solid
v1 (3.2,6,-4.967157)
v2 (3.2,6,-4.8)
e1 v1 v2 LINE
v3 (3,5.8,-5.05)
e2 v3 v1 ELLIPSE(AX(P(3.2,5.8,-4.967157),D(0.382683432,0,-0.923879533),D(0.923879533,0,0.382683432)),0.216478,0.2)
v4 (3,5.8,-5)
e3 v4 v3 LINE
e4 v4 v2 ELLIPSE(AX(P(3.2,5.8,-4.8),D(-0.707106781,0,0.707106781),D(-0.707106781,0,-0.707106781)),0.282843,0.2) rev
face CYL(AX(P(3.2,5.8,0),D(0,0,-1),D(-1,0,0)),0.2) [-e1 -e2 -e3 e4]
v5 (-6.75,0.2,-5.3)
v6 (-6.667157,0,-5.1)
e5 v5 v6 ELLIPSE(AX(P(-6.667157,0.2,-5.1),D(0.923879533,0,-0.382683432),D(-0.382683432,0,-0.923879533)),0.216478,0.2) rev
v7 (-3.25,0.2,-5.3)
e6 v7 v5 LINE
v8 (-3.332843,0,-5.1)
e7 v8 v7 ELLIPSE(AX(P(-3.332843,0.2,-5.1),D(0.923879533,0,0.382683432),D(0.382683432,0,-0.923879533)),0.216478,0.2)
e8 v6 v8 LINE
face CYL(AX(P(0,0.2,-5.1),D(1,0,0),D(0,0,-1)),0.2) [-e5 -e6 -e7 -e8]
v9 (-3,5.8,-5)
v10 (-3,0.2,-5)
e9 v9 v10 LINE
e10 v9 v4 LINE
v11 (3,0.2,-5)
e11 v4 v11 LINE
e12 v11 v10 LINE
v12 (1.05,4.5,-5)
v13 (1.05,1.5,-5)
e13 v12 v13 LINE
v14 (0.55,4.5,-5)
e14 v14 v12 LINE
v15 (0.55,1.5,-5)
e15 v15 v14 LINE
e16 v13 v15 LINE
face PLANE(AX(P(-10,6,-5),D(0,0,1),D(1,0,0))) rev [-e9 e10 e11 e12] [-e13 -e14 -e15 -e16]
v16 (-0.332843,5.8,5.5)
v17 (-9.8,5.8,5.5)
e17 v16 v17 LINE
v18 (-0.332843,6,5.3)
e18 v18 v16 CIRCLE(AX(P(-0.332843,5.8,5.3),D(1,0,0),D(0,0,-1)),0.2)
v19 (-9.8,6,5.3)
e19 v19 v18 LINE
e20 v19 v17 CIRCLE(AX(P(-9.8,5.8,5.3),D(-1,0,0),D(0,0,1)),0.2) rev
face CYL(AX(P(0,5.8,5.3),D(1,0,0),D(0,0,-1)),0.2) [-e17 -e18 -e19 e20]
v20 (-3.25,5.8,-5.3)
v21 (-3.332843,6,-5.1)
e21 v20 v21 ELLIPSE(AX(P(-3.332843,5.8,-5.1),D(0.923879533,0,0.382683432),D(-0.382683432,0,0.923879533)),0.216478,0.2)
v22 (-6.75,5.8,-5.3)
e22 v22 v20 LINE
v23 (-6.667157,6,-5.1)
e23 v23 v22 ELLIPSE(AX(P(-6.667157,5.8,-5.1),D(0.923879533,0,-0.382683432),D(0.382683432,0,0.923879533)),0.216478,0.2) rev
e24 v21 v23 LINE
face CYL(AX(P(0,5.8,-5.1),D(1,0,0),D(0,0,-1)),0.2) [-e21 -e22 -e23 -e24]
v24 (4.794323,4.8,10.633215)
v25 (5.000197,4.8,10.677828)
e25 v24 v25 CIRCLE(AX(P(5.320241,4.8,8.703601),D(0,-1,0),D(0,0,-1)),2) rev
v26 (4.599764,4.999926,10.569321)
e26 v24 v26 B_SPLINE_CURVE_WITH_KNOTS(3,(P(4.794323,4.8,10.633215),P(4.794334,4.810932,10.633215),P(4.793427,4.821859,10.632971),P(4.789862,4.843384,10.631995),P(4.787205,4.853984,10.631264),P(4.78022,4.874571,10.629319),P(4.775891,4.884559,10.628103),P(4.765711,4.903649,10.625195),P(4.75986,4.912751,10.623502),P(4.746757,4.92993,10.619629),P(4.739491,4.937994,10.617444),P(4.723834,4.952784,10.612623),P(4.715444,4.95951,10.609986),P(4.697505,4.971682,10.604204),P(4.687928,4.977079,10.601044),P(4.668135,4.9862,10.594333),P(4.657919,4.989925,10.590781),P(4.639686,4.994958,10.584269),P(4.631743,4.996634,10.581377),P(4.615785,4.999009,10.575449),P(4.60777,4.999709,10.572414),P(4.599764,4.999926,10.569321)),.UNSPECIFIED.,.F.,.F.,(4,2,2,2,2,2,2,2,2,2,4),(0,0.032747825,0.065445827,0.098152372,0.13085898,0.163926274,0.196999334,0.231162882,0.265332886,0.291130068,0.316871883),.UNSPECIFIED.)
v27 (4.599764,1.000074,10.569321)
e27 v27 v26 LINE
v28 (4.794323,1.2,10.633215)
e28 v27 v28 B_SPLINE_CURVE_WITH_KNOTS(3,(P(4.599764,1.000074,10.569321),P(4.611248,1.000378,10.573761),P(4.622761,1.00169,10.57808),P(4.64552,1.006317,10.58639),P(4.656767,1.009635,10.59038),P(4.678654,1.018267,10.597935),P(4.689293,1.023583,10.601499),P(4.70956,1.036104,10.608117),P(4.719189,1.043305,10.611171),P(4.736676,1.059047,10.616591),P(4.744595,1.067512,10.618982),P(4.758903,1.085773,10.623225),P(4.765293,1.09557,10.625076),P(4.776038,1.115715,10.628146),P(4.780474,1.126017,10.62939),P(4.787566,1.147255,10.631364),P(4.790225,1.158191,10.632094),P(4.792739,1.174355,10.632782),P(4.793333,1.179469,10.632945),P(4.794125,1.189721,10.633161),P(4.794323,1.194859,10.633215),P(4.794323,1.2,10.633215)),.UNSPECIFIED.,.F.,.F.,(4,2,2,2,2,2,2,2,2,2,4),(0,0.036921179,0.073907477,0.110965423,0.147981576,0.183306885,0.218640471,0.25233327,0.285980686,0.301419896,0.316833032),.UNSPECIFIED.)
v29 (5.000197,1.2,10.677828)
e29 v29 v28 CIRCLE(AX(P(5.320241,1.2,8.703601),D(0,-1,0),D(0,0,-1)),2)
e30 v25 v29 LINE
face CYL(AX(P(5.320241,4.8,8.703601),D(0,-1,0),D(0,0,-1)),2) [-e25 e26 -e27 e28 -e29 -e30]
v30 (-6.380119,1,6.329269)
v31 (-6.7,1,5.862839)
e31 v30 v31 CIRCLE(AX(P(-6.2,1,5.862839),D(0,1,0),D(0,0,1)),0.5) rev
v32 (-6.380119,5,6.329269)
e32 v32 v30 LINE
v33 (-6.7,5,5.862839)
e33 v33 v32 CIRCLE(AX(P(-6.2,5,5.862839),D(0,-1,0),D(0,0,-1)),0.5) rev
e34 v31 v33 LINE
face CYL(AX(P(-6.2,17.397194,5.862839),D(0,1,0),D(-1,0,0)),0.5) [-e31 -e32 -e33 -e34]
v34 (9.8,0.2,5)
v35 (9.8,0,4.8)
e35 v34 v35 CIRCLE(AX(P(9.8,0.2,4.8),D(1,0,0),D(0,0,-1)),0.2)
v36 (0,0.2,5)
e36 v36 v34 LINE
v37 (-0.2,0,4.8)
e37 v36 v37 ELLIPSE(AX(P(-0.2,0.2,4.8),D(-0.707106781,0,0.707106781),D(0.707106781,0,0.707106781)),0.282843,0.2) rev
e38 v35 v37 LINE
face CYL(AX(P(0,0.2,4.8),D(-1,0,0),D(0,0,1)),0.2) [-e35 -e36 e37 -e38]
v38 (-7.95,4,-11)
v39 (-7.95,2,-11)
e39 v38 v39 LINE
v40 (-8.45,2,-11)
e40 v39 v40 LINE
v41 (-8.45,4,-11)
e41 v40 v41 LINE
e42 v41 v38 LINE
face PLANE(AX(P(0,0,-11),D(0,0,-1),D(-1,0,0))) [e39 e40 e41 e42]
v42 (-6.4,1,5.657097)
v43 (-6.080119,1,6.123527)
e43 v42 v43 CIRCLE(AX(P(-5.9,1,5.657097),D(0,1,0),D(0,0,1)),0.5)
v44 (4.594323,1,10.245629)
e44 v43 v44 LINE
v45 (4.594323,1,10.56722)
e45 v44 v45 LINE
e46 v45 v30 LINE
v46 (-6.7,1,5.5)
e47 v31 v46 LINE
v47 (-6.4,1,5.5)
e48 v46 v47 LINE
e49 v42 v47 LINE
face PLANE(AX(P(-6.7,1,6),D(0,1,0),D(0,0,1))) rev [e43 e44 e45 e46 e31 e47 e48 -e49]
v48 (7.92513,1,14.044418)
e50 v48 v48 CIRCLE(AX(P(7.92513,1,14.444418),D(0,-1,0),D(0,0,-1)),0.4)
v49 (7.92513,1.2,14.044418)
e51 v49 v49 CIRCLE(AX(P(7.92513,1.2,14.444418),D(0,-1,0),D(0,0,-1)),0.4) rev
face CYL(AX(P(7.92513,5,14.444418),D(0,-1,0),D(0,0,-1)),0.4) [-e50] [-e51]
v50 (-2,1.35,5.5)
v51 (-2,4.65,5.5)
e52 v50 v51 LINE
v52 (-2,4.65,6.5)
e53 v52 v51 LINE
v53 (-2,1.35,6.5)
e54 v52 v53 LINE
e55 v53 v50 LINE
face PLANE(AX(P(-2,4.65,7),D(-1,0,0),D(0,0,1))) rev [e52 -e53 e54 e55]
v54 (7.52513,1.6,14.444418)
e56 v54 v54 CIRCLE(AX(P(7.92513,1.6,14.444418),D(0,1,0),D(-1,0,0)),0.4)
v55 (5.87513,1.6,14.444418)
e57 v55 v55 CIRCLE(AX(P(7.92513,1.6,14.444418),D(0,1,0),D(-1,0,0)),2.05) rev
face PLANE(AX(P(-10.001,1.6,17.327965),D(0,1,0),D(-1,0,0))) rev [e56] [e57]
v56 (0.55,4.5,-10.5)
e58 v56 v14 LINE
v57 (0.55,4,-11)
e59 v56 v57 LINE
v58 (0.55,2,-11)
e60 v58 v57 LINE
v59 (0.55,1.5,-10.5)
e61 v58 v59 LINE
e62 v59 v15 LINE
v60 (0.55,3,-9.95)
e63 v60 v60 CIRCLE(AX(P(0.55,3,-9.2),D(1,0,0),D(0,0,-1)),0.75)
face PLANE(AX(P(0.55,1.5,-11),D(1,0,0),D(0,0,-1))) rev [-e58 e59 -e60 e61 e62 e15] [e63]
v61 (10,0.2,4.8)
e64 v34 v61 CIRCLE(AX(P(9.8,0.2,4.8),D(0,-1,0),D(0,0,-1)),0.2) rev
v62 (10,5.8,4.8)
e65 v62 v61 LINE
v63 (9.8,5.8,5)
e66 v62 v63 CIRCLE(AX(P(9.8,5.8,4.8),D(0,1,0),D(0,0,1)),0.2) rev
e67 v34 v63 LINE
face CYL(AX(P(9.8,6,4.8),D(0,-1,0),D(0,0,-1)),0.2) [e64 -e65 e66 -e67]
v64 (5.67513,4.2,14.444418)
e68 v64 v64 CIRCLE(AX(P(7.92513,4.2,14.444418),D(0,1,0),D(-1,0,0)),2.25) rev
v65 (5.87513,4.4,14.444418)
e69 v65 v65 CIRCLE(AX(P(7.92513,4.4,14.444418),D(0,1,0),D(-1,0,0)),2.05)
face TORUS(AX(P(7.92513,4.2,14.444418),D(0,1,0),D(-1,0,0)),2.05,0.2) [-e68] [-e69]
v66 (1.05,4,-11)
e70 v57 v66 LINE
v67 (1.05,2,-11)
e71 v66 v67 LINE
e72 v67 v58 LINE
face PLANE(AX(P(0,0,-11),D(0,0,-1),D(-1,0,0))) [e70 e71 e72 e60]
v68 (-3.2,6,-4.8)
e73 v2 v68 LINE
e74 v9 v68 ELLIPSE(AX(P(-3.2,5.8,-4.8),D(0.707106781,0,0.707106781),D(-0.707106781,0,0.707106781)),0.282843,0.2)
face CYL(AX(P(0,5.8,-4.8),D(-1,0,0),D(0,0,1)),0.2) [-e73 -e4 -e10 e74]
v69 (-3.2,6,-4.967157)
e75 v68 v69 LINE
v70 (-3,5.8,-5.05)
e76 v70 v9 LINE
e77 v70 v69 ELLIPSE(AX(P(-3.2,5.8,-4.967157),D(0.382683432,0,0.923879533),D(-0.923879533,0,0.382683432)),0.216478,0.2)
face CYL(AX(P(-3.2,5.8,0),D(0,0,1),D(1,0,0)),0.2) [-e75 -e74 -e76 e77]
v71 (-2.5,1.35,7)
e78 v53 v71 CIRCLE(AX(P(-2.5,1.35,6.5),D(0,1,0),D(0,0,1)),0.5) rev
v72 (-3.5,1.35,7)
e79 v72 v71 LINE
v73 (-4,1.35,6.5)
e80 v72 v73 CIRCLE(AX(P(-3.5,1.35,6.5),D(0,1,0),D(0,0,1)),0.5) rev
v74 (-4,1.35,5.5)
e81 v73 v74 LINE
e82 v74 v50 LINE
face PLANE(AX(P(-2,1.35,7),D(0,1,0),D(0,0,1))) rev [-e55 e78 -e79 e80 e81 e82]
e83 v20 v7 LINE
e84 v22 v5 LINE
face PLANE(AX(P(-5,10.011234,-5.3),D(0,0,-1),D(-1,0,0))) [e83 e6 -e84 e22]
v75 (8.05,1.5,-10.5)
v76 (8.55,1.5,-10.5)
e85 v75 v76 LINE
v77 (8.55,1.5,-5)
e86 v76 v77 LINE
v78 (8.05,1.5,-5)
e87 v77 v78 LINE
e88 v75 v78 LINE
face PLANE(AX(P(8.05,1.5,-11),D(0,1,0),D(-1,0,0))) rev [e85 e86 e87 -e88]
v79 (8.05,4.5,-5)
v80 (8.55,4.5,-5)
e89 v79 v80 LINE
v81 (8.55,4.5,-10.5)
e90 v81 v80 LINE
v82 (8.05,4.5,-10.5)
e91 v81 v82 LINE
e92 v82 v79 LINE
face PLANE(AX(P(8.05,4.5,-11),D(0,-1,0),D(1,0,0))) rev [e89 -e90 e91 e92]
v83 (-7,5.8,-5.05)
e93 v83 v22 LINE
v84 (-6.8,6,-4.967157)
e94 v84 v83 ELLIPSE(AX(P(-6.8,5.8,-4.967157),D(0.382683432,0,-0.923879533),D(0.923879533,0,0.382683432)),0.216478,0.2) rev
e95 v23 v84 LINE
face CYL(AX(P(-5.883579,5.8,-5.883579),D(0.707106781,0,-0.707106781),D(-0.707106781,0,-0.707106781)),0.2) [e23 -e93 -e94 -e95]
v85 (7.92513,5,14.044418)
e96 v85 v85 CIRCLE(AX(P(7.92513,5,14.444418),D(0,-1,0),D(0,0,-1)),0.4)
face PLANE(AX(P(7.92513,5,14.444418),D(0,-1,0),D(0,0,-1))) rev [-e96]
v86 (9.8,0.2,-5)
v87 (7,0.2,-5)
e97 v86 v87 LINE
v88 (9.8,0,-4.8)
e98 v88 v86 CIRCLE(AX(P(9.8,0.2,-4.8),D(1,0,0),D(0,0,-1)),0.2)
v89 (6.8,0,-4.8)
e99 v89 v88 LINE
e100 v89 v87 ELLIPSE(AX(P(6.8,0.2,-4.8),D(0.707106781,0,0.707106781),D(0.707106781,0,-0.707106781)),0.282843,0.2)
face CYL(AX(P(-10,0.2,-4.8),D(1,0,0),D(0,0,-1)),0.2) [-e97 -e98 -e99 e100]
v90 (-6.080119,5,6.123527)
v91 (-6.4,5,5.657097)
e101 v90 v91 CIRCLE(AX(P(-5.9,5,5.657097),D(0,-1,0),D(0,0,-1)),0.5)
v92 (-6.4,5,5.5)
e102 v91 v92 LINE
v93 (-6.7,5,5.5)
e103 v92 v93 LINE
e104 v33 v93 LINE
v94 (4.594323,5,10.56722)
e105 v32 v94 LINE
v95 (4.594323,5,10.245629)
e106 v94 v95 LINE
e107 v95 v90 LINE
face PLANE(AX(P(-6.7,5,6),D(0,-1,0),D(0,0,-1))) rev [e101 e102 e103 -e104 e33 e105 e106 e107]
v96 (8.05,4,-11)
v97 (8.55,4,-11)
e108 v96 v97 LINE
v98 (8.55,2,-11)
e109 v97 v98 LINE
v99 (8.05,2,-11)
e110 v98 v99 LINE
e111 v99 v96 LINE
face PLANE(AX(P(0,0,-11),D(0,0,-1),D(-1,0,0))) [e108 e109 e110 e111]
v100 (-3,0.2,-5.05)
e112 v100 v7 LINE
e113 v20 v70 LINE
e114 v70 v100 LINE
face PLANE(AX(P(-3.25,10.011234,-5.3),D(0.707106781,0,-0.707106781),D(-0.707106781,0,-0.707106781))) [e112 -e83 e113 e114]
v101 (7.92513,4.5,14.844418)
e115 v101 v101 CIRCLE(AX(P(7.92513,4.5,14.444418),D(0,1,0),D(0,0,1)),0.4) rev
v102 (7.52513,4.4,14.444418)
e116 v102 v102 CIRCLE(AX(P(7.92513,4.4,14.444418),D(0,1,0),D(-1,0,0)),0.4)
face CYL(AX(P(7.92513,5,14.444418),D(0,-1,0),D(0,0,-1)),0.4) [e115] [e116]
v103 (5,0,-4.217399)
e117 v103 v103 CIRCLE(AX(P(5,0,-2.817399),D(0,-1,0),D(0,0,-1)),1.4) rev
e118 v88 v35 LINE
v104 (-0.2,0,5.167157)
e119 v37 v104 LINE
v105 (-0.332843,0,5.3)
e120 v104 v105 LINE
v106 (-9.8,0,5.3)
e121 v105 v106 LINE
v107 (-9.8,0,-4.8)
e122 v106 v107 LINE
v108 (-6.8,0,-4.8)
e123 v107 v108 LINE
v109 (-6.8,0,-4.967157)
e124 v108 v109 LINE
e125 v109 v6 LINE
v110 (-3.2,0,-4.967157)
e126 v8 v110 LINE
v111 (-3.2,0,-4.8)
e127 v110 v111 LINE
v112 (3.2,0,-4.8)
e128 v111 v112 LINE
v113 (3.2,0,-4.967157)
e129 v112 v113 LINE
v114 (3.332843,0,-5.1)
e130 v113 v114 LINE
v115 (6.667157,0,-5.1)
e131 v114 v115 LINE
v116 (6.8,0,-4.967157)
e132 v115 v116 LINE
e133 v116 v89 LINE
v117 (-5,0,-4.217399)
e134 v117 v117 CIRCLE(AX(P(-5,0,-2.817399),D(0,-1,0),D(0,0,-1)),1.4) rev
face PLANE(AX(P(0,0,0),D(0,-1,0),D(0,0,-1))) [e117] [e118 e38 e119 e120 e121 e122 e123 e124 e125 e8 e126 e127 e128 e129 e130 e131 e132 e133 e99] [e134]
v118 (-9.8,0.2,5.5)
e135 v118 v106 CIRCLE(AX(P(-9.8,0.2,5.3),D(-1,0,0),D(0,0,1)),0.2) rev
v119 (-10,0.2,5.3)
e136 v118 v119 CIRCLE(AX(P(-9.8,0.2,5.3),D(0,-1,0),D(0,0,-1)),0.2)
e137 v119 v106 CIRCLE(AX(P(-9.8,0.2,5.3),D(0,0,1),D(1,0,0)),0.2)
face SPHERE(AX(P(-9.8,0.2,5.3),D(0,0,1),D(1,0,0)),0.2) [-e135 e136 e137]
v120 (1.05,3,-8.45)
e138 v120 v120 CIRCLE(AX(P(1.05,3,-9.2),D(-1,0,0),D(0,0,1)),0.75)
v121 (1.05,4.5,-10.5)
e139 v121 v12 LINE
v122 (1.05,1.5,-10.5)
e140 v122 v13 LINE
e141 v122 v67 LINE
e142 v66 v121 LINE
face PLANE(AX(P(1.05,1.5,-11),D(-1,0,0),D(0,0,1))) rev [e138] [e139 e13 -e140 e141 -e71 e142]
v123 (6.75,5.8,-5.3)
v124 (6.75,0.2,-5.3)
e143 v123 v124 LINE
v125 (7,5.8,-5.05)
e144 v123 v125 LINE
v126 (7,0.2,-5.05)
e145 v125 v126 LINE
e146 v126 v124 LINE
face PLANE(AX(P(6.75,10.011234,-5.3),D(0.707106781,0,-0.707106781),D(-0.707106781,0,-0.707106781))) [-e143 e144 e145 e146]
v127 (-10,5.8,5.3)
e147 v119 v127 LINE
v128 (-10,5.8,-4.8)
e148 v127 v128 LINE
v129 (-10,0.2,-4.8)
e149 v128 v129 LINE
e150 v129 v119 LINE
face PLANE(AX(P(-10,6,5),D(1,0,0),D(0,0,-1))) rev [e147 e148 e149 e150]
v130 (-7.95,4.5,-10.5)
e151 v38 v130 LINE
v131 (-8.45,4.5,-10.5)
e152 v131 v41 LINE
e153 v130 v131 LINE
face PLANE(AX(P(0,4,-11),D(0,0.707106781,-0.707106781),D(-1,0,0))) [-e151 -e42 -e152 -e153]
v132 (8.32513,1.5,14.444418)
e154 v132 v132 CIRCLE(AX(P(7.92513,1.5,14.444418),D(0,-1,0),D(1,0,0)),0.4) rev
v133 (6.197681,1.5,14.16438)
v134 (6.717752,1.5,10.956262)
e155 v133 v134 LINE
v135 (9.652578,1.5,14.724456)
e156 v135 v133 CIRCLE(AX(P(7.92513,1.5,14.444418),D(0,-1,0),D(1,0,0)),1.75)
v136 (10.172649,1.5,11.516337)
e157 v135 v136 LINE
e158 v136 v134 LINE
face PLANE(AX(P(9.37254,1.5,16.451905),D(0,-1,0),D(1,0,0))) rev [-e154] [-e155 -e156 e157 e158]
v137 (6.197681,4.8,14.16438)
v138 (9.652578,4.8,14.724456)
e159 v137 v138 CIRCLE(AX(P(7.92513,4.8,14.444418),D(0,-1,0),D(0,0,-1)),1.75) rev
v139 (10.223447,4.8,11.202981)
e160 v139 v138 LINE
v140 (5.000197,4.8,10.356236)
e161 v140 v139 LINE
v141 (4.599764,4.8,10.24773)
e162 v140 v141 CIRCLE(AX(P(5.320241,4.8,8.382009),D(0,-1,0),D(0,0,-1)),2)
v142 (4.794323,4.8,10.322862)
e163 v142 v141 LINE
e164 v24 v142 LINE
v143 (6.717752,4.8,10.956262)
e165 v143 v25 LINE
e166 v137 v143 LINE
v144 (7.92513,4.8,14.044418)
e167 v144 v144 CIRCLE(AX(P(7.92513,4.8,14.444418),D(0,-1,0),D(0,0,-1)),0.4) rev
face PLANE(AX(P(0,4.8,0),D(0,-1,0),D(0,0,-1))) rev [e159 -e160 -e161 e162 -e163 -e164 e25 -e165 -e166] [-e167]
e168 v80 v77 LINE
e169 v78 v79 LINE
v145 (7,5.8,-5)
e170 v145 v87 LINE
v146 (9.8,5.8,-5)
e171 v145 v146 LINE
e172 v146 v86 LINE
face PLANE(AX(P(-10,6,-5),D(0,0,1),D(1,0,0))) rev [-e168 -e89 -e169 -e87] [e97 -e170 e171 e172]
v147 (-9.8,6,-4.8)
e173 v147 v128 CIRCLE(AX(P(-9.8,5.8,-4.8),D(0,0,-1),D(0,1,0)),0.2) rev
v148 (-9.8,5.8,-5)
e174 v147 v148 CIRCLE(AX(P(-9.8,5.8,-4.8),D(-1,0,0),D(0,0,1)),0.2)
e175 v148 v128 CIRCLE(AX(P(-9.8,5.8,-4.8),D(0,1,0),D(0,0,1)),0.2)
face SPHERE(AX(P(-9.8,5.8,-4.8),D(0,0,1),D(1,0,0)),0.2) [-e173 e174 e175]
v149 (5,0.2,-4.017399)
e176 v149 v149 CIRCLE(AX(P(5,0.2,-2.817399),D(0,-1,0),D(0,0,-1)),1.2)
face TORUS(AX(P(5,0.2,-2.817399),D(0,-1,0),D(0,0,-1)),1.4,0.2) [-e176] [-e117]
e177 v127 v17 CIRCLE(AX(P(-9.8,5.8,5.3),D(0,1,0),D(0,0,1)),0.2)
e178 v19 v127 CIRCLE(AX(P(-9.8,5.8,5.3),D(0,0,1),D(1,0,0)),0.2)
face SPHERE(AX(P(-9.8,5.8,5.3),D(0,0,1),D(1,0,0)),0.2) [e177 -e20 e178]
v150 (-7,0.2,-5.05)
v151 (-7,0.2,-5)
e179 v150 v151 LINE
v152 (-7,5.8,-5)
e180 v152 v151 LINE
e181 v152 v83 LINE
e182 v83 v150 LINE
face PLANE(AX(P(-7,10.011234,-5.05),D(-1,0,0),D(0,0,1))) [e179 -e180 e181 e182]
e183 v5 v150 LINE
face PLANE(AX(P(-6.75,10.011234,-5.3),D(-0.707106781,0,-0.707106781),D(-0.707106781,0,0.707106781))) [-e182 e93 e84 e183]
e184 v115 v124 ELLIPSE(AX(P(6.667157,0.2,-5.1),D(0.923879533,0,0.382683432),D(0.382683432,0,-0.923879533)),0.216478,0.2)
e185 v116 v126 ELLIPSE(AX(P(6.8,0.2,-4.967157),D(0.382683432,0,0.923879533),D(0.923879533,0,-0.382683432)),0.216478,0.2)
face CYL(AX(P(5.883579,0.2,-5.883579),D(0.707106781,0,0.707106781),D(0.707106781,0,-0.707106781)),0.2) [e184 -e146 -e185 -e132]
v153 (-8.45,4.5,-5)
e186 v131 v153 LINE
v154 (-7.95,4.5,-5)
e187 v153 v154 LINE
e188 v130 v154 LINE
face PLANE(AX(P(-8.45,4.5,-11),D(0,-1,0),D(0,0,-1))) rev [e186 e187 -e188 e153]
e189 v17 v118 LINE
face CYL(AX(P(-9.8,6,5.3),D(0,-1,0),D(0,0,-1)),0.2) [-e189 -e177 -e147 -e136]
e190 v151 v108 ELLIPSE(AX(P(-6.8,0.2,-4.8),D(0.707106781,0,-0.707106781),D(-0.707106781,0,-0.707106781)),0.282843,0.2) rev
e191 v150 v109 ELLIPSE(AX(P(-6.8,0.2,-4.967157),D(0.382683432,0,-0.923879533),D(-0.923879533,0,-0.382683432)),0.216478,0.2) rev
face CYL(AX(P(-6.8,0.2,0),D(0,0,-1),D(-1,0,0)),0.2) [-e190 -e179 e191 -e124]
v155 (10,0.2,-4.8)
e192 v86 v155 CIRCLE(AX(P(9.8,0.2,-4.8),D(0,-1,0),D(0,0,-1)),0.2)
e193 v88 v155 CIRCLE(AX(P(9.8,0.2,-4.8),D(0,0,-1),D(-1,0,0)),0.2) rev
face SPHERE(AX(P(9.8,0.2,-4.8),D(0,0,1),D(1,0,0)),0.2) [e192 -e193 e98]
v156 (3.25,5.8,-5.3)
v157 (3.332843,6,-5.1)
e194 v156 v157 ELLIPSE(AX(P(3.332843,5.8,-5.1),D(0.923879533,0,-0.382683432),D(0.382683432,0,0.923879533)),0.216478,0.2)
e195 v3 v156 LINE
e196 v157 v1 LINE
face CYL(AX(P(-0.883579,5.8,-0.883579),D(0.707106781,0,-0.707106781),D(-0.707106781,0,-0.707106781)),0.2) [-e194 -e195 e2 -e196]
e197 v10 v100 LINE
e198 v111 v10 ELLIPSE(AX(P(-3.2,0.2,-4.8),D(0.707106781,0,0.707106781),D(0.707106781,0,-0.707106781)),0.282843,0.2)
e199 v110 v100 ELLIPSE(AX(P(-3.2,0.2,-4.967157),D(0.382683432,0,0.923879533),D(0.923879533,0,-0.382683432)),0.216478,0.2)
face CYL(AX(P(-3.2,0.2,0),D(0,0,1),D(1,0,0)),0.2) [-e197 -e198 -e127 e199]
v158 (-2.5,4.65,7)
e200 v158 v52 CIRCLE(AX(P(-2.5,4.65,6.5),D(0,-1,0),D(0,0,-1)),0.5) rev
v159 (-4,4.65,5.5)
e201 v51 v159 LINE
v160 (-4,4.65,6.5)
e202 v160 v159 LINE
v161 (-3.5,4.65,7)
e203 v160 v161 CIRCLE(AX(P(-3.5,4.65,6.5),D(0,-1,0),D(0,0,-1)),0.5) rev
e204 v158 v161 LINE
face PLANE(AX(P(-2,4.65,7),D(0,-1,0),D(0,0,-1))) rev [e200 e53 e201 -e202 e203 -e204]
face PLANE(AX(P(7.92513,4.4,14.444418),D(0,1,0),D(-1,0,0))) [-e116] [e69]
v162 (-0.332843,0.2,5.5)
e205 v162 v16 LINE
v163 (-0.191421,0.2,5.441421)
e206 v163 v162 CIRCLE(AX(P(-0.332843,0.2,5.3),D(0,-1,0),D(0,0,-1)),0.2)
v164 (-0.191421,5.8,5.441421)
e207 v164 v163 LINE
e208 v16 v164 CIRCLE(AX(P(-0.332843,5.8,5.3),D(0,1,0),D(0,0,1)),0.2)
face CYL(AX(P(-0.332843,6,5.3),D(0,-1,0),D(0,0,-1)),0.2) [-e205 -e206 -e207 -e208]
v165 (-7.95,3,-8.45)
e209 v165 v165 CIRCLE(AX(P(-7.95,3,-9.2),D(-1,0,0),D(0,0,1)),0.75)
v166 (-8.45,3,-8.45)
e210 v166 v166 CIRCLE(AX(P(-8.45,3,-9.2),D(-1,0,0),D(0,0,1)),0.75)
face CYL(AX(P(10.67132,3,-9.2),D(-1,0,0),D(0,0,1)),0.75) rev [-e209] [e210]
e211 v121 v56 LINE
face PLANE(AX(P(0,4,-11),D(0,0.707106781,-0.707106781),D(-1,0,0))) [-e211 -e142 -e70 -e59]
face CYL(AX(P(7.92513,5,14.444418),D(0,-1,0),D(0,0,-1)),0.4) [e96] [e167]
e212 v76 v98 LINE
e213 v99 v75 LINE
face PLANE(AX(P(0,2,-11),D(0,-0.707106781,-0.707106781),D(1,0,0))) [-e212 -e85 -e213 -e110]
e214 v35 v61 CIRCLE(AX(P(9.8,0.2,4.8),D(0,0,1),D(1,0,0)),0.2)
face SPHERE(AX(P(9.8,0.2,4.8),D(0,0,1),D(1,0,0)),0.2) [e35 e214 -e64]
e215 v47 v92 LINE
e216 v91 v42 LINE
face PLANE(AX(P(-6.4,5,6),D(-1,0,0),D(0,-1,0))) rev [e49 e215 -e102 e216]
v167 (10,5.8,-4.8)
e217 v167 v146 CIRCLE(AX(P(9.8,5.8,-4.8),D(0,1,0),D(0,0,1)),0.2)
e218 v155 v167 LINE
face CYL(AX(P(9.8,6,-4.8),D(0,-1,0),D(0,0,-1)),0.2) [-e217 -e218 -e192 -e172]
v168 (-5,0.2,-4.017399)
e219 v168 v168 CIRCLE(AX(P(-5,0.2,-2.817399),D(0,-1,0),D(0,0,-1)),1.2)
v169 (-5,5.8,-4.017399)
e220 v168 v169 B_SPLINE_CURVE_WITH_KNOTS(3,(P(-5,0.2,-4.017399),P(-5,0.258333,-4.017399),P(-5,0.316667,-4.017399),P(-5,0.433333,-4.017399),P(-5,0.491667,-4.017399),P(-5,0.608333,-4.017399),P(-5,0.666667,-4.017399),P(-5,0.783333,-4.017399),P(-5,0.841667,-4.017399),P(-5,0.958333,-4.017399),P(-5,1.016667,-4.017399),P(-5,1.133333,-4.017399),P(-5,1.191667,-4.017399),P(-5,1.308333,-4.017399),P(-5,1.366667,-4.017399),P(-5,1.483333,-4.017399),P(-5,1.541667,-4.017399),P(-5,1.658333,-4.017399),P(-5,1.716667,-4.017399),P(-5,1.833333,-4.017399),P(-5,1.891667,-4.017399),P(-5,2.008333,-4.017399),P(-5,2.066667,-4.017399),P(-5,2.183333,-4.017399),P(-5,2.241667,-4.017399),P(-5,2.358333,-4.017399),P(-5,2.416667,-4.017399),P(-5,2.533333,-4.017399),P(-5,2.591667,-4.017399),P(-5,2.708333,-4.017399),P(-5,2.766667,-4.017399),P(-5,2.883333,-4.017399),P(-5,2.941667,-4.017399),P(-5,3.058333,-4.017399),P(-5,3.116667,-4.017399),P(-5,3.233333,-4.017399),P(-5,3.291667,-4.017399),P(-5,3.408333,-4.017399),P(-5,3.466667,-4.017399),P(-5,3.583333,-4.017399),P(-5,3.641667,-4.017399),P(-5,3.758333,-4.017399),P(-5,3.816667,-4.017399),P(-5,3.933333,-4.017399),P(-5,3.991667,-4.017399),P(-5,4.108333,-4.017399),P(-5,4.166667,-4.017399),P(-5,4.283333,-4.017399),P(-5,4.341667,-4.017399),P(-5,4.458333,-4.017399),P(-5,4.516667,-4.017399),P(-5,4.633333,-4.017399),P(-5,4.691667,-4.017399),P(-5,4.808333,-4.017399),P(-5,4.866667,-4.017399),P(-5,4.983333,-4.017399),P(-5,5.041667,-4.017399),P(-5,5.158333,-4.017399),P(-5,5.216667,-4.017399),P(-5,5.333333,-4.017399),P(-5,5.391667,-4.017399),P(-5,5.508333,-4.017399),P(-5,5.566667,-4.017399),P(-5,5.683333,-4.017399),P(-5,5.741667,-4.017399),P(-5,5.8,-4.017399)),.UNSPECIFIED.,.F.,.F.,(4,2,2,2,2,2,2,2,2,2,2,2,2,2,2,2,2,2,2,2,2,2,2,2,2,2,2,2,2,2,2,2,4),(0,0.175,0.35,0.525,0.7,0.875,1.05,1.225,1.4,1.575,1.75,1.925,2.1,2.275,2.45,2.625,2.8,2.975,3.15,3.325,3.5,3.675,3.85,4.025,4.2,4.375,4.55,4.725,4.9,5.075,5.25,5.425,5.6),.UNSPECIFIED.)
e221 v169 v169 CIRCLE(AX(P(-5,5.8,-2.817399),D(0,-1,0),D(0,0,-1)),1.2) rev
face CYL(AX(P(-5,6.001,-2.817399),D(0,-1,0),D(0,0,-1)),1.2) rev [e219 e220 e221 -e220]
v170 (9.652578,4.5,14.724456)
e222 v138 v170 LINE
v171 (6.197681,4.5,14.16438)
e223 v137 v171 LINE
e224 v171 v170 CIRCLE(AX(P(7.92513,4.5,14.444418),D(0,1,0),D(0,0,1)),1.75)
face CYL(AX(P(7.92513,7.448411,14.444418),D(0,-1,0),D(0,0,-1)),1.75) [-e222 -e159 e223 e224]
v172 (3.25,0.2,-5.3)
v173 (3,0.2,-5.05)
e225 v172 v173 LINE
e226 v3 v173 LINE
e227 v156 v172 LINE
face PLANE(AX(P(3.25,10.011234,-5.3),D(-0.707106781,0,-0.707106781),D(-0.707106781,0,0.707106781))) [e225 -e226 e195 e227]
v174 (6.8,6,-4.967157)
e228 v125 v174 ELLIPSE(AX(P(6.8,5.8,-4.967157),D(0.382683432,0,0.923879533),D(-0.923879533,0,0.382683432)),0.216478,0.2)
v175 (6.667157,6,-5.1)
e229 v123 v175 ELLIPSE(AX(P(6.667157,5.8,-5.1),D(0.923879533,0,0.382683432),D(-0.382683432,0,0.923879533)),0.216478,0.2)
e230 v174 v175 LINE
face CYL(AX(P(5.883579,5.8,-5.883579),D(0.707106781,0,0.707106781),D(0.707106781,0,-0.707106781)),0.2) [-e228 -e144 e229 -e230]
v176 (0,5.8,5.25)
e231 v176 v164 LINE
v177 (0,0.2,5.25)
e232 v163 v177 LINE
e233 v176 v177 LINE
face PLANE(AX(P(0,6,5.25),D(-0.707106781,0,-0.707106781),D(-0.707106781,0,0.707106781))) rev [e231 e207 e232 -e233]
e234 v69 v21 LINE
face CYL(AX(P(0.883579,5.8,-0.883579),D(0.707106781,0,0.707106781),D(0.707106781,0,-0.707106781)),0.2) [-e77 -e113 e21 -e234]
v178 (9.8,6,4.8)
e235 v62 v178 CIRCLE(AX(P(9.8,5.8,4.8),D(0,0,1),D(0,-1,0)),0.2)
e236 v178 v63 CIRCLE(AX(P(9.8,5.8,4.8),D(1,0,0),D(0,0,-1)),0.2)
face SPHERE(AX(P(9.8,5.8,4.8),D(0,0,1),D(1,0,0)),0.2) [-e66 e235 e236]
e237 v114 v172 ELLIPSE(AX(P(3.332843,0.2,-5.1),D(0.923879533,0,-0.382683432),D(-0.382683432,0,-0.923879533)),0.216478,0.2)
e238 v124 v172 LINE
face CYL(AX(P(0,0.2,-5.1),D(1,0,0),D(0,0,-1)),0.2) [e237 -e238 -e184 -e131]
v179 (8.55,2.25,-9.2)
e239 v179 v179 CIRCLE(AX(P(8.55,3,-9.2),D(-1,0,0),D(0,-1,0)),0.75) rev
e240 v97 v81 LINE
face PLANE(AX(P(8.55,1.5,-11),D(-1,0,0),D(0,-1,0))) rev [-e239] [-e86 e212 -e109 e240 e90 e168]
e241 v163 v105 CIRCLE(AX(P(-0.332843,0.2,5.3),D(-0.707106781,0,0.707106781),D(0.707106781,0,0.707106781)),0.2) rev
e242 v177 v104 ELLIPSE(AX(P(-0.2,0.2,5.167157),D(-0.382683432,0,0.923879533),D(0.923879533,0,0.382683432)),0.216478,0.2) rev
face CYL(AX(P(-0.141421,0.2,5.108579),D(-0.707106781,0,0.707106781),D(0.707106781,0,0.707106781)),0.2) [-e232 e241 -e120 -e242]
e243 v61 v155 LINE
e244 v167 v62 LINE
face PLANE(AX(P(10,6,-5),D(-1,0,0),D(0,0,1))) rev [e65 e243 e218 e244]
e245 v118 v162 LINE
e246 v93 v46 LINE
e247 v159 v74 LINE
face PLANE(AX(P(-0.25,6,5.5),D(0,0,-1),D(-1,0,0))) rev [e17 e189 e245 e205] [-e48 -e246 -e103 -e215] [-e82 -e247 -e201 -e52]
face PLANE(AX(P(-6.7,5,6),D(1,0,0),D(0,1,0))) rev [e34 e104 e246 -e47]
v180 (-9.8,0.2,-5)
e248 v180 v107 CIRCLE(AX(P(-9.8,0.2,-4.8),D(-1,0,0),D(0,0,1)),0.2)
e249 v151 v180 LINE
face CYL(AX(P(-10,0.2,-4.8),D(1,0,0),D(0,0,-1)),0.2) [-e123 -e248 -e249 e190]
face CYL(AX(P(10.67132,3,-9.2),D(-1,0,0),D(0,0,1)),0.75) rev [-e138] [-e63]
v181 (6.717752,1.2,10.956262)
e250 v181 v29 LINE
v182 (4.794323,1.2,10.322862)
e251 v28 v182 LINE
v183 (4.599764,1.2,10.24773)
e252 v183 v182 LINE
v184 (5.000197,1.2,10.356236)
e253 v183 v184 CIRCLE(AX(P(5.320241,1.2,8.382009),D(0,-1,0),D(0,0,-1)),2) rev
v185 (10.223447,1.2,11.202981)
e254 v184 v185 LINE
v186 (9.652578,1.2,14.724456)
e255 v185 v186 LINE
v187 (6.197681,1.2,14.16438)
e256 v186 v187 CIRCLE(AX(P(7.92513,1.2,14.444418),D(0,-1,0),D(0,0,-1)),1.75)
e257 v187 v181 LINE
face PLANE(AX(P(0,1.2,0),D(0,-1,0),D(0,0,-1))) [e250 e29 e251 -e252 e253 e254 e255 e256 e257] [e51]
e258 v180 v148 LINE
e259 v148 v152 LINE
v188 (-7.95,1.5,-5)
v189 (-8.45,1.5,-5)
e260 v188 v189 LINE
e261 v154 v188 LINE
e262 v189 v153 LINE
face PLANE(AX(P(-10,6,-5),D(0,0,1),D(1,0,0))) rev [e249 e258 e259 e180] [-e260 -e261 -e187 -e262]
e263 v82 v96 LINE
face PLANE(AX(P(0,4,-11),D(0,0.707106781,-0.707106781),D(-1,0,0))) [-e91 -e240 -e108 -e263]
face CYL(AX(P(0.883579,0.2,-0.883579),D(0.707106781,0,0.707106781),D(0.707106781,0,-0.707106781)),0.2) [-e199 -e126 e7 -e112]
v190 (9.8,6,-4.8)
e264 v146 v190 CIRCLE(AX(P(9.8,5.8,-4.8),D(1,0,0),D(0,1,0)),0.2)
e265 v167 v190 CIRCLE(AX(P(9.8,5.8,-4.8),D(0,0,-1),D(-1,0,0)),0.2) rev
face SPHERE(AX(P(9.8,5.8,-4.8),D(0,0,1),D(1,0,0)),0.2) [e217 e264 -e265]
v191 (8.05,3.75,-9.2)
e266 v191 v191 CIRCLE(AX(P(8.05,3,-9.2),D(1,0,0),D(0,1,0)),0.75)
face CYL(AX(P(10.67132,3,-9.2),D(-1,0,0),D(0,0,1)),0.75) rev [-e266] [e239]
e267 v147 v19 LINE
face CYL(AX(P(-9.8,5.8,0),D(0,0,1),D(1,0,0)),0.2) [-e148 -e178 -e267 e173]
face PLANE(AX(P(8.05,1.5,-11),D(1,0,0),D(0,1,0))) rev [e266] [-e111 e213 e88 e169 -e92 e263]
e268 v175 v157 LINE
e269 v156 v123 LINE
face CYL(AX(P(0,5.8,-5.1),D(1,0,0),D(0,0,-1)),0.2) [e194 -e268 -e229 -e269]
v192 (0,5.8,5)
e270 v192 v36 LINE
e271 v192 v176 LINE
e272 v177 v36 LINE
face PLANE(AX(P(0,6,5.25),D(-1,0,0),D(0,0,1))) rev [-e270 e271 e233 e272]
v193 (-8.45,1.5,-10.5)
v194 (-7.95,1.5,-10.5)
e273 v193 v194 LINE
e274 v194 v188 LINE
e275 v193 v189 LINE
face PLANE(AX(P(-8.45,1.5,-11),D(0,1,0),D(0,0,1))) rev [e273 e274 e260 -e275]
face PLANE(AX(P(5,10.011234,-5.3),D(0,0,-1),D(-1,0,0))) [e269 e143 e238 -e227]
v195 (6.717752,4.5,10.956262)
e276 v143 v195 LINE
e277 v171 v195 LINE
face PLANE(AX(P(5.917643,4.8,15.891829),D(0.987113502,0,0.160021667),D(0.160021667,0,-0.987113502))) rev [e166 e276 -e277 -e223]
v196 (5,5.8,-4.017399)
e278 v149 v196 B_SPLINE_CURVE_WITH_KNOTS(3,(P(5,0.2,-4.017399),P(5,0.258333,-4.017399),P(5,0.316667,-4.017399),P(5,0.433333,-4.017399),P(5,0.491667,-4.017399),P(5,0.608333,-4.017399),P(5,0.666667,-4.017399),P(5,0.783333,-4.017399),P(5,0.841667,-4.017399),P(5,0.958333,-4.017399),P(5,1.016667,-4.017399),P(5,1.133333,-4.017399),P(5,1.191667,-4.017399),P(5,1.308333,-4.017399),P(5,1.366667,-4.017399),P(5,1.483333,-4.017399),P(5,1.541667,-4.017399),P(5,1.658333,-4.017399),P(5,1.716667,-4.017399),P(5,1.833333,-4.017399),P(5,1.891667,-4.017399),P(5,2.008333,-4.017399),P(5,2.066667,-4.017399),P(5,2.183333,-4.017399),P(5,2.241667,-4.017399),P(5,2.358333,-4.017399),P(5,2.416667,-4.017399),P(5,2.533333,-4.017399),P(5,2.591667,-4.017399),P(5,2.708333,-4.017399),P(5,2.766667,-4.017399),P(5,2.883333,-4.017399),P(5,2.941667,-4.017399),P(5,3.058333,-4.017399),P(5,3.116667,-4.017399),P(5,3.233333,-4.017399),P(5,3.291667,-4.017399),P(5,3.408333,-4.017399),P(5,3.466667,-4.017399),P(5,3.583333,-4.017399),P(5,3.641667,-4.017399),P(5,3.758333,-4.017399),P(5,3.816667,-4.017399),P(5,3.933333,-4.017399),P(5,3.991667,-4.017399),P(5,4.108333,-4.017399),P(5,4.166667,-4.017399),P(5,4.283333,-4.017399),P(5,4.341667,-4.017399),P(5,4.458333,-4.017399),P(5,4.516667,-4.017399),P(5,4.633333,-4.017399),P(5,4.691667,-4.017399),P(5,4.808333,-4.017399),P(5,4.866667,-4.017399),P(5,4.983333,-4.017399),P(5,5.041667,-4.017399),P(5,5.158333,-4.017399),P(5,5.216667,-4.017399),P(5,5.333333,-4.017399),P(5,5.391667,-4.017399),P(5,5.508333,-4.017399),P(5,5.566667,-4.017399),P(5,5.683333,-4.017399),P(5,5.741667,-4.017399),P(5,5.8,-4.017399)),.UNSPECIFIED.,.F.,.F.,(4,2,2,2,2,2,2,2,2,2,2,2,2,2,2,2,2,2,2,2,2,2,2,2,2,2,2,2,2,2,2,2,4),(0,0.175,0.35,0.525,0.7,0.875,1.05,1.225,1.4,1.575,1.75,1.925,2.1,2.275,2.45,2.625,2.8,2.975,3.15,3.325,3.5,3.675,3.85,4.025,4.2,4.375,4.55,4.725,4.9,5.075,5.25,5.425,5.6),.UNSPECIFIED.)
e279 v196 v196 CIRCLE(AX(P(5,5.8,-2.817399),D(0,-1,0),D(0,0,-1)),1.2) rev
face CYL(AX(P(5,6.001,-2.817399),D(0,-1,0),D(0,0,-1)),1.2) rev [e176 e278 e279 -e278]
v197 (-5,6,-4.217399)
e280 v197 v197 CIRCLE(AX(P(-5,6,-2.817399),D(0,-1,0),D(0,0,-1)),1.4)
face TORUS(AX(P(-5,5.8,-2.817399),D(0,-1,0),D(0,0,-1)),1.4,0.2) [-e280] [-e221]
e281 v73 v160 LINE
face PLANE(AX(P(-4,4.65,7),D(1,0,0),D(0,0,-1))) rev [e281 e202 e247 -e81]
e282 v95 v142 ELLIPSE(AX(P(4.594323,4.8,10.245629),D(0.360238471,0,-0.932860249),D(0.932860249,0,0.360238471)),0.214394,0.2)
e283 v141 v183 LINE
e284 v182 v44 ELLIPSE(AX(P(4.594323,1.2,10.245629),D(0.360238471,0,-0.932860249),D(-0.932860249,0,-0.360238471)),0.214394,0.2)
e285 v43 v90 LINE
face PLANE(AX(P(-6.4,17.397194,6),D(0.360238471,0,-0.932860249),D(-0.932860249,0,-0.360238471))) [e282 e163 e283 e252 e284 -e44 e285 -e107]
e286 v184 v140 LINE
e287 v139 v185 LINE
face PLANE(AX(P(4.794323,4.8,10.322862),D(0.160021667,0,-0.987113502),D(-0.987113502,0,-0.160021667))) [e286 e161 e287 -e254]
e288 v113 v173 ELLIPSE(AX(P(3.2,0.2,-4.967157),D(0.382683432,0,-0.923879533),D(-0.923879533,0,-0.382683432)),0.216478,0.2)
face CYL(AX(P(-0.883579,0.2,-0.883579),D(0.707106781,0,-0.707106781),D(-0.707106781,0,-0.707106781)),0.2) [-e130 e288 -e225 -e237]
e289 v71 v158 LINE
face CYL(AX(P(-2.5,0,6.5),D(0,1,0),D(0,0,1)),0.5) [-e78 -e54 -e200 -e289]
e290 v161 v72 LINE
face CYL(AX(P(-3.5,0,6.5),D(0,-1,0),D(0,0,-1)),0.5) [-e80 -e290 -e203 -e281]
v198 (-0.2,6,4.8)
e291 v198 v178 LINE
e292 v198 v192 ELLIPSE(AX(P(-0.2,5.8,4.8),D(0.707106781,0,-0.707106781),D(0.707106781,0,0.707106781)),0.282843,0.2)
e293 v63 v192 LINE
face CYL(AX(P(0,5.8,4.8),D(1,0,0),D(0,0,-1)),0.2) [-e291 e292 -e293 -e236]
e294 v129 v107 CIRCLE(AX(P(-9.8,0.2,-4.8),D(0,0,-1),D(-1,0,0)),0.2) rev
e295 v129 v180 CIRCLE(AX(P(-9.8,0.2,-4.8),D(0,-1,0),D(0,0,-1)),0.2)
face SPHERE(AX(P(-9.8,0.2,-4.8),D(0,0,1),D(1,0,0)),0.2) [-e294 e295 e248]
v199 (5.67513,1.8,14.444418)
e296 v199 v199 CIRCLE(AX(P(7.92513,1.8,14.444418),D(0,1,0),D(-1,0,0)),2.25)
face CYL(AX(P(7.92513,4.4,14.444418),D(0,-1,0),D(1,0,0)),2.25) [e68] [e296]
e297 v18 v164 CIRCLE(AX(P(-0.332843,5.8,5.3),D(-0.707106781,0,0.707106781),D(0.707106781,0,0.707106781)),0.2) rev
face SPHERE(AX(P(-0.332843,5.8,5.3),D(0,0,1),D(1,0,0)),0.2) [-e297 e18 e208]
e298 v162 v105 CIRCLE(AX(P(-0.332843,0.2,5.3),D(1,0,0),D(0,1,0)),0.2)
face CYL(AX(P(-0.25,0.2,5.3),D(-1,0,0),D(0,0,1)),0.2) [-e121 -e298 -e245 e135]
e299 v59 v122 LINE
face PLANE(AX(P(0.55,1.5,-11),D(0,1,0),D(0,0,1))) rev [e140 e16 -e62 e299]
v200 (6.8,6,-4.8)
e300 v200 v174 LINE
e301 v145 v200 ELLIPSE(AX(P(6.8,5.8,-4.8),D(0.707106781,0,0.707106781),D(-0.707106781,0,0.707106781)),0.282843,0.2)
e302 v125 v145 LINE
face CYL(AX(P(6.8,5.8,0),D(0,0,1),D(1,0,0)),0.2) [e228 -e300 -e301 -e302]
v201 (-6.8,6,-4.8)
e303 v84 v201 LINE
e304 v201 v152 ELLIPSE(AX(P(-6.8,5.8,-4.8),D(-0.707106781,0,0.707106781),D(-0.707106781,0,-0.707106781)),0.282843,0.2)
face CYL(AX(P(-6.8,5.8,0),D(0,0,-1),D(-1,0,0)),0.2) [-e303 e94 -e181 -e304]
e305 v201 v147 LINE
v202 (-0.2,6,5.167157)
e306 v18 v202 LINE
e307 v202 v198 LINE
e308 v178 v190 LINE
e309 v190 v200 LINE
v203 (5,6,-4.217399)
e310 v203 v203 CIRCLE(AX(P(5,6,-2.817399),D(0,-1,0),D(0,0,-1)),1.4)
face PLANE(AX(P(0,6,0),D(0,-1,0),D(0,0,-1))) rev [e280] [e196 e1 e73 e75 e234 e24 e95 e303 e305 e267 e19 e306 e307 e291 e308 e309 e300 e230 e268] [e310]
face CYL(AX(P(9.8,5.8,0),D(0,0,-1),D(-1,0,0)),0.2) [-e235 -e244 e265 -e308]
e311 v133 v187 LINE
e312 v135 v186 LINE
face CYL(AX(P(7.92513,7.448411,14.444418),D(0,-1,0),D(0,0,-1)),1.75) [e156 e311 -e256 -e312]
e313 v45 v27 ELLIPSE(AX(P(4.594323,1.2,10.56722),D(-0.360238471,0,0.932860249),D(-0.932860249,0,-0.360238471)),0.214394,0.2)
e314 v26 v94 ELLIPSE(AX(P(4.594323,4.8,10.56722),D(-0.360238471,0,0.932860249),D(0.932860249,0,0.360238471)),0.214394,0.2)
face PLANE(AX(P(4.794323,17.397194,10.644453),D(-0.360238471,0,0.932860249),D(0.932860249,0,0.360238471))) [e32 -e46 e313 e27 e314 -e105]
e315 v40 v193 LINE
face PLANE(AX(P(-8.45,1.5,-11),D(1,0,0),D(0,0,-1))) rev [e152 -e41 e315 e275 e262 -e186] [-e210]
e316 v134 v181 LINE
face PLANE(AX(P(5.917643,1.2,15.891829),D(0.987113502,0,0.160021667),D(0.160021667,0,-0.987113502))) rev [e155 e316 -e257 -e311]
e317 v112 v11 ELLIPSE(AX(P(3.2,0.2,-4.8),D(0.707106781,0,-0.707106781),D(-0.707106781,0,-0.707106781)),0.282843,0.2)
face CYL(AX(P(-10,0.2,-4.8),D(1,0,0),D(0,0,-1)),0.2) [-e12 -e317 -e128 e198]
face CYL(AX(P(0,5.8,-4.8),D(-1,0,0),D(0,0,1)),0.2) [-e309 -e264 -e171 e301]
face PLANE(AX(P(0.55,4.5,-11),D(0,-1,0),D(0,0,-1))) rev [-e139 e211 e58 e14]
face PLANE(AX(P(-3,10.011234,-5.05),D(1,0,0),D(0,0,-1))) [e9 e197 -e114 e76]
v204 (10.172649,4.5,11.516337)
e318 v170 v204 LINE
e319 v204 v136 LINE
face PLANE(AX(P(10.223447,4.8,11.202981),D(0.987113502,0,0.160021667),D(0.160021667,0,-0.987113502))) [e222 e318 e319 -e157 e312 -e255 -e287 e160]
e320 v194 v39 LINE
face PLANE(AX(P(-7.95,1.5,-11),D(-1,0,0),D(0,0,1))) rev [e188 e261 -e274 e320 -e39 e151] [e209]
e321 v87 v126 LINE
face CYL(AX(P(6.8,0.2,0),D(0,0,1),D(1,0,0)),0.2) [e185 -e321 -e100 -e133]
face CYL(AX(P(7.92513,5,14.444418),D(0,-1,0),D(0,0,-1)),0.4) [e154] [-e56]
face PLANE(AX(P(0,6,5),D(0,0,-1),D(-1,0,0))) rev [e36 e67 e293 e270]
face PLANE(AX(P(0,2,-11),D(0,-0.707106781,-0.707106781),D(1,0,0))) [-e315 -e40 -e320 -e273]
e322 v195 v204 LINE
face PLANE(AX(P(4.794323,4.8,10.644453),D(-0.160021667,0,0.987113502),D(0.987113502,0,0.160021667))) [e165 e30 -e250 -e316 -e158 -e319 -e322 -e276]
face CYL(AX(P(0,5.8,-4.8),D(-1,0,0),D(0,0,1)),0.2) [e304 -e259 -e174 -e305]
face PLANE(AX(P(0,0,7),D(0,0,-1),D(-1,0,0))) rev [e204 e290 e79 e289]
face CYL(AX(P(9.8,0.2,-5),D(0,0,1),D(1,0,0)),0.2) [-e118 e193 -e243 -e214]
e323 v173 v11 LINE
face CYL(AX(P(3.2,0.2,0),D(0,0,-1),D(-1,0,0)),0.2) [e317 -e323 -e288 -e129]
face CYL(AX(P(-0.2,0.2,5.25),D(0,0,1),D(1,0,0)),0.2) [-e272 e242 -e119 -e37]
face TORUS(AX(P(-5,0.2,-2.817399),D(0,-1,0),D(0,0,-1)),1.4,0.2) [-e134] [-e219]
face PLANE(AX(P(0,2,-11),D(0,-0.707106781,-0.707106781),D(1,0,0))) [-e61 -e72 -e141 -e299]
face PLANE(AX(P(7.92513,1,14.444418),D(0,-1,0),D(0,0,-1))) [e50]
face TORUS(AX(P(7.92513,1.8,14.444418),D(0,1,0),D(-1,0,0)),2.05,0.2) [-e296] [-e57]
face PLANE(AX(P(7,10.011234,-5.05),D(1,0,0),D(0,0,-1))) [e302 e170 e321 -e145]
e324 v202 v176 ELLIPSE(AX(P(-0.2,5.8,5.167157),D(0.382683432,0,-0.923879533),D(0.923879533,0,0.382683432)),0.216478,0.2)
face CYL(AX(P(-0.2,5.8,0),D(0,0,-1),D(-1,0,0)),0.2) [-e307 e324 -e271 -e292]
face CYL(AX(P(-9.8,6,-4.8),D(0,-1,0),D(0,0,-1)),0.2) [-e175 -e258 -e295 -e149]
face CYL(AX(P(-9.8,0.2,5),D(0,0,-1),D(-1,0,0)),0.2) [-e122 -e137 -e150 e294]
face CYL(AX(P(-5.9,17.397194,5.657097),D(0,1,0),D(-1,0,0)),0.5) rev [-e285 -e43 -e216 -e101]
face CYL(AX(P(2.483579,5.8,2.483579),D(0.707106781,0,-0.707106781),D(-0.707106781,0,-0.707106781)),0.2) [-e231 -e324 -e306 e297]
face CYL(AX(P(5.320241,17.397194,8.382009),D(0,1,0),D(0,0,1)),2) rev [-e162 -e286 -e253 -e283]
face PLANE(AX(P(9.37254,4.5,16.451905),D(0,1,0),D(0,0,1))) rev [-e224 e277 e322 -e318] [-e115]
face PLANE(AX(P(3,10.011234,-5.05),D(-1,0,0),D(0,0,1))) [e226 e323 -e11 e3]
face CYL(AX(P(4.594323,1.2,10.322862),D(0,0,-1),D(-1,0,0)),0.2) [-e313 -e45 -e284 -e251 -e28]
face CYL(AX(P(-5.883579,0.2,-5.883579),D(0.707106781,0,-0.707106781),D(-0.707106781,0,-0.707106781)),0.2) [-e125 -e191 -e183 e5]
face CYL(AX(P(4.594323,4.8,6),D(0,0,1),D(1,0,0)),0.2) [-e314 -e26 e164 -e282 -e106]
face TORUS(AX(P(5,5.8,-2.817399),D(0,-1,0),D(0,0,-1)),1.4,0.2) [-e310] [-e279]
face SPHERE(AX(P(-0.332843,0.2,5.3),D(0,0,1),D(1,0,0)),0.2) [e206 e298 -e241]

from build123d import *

# Parameters (mm, degrees)
BOSS_EXTRUDE1_DEPTH  = 6
CUT_EXTRUDE1_REACH   = 14.894
SKETCH2_R            = 1.2
BOSS_EXTRUDE2_DEPTH  = 6
FILLET1_R            = 0.2
SKETCH4_W            = 0.5
SKETCH4_H            = 3
BOSS_EXTRUDE3_DEPTH  = 6
CHAMFER1_SIZE        = 0.5
CUT_EXTRUDE2_REACH   = 24.303
SKETCH5_R            = 0.75
SKETCH6_W            = 2
SKETCH6_H            = 3.3
BOSS_EXTRUDE4_DEPTH  = 1.5
FILLET2_R            = 0.5
SKETCH7_W            = 0.3
SKETCH7_H            = 4
BOSS_EXTRUDE5_DEPTH  = 0.5
BOSS_EXTRUDE6_DEPTH  = 4
FILLET3_R            = 0.5
BOSS_EXTRUDE7_DEPTH  = 3.8
CUT_EXTRUDE3_DEPTH   = 0.2
FILLET4_R            = 2
SKETCH11_W           = 3.5
SKETCH11_H           = 0.3
BOSS_EXTRUDE8_DEPTH  = 5
CUT_EXTRUDE4_START   = -3.6
CUT_EXTRUDE4_DEPTH   = 3.6
SKETCH13_R           = 2.25
BOSS_EXTRUDE9_DEPTH  = 2.9
CUT_EXTRUDE5_REACH   = 28.865
SKETCH14_W           = 5.5
SKETCH14_H           = 0.1
FILLET6_R            = 0.2
SKETCH15_R           = 0.4
BOSS_EXTRUDE10_DEPTH = 0.2
SKETCH16_R           = 0.4
BOSS_EXTRUDE11_DEPTH = 4
FILLET7_R            = 0.2


# Some blends are built 0.0001 mm under size
with BuildPart() as part:
    # Sketch1 → Boss-Extrude1 (new body)
    with BuildSketch(Plane(origin=(0, 0, 0), x_dir=(1, 0, 0), z_dir=(0, 1, 0))):
        Polygon((-10, 5), (10, 5), (10, -5), (0, -5), (0, -5.25), (-0.25, -5.5), (-10, -5.5), (-10, -5), align=None)
    extrude(amount=BOSS_EXTRUDE1_DEPTH)

    # Sketch2 → Cut-Extrude1 (cut, up to next)
    with BuildSketch(Plane.XZ, mode=Mode.PRIVATE) as cut_extrude1_sk1:
        with Locations(Location((-5, -2.817398743, 0), (0, 0, 270))):
            Circle(SKETCH2_R)
    cut_extrude1_tool1 = extrude(cut_extrude1_sk1.sketch, amount=-CUT_EXTRUDE1_REACH, mode=Mode.PRIVATE) & part.part
    # Sketch2 → Cut-Extrude1 (cut, up to next)
    with BuildSketch(Plane.XZ, mode=Mode.PRIVATE) as cut_extrude1_sk2:
        with Locations(Location((5, -2.817398743, 0), (0, 0, 270))):
            Circle(SKETCH2_R)
    cut_extrude1_tool2 = extrude(cut_extrude1_sk2.sketch, amount=-CUT_EXTRUDE1_REACH, mode=Mode.PRIVATE) & part.part
    add(cut_extrude1_tool1.solids().sort_by_distance((-5, 0, -2.817399))[0], mode=Mode.SUBTRACT)
    add(cut_extrude1_tool2.solids().sort_by_distance((5, 0, -2.817399))[0], mode=Mode.SUBTRACT)

    # Sketch3 → Boss-Extrude2 (add)
    with BuildSketch(Plane.XZ):
        Polygon((5, -5.3), (6.75, -5.3), (7, -5.05), (7, -5), (3, -5), (3, -5.05), (3.25, -5.3), align=None)
        Polygon((-6.75, -5.3), (-7, -5.05), (-7, -5), (-3, -5), (-3, -5.05), (-3.25, -5.3), (-5, -5.3), align=None)
    extrude(amount=-BOSS_EXTRUDE2_DEPTH)

    # Fillet1
    fillet1_edges = [part.edges().sort_by_distance(p)[0] for p in [
        (10, 3, 5),
        (10, 3, -5),
        (-10, 3, 5.5),
        (-0.25, 3, 5.5),
        (-5.125, 0, 5.5),
        (-5.125, 6, 5.5),
        (-0.125, 0, 5.375),
        (-0.125, 6, 5.375),
        (0, 0, 5.125),
        (0, 6, 5.125),
        (5, 0, 5),
        (5, 6, 5),
        (10, 0, 0),
        (10, 6, 0),
        (8.5, 6, -5),
        (8.5, 0, -5),
        (7, 6, -5.025),
        (7, 0, -5.025),
        (6.875, 6, -5.175),
        (6.875, 0, -5.175),
        (5, 6, -5.3),
        (5, 0, -5.3),
        (3.125, 6, -5.175),
        (3.125, 0, -5.175),
        (3, 6, -5.025),
        (3, 0, -5.025),
        (0, 6, -5),
        (0, 0, -5),
        (-3, 6, -5.025),
        (-3, 0, -5.025),
        (-3.125, 6, -5.175),
        (-3.125, 0, -5.175),
        (-5, 6, -5.3),
        (-5, 0, -5.3),
        (-6.875, 6, -5.175),
        (-6.875, 0, -5.175),
        (-7, 6, -5.025),
        (-7, 0, -5.025),
        (-8.5, 6, -5),
        (-8.5, 0, -5),
        (-10, 0, 0.25),
        (-10, 6, 0.25),
        (-5, 0, -1.617398743),
        (-5, 6, -1.617398743),
        (5, 0, -1.617398743),
        (5, 6, -1.617398743),
        (-10, 3, -5),
    ]]
    fillet(fillet1_edges, radius=FILLET1_R)

    # Sketch4 → Boss-Extrude3 (add)
    with BuildSketch(Plane(origin=(0, 0, -5), x_dir=(-1, 0, 0), z_dir=(0, 0, -1))):
        with Locations((8.2, 3)):
            Rectangle(SKETCH4_W, SKETCH4_H)
        with Locations((-0.8, 3)):
            Rectangle(SKETCH4_W, SKETCH4_H)
        with Locations((-8.3, 3)):
            Rectangle(SKETCH4_W, SKETCH4_H)
    extrude(amount=BOSS_EXTRUDE3_DEPTH)

    # Chamfer1
    chamfer1_edges = [part.edges().sort_by_distance(p)[0] for p in [
        (-8.2, 4.5, -11),
        (-8.2, 1.5, -11),
        (0.8, 4.5, -11),
        (0.8, 1.5, -11),
        (8.3, 4.5, -11),
        (8.3, 1.5, -11),
    ]]
    chamfer(chamfer1_edges, length=CHAMFER1_SIZE)

    # Cut-Extrude2: up to this face of the body (flat: up to its plane)
    cut_extrude2_end = Plane(part.part.faces().sort_by_distance((8.55, 3, -7.960093897))[0])
    # Sketch5 → Cut-Extrude2 (cut, up to the picked face)
    with BuildSketch(Plane.ZY.offset(8.45), mode=Mode.PRIVATE) as cut_extrude2_sk1:
        with Locations(Location((-9.2, 3, 0), (0, 0, 270))):
            Circle(SKETCH5_R)
    cut_extrude2_tool1 = split(extrude(cut_extrude2_sk1.sketch, amount=-CUT_EXTRUDE2_REACH, mode=Mode.PRIVATE), bisect_by=cut_extrude2_end, keep=Keep.BOTH, mode=Mode.PRIVATE)
    add(cut_extrude2_tool1.solids().sort_by(Axis((-8.45, 3, -9.2), (1, 0, 0)))[0], mode=Mode.SUBTRACT)

    # Sketch6 → Boss-Extrude4 (add)
    with BuildSketch(Plane.XY.offset(5.5)):
        with Locations((-3, 3)):
            Rectangle(SKETCH6_W, SKETCH6_H)
    extrude(amount=BOSS_EXTRUDE4_DEPTH)

    # Fillet2
    fillet2_edges = [part.edges().sort_by_distance(p)[0] for p in [
        (-2, 3, 7),
        (-4, 3, 7),
    ]]
    fillet(fillet2_edges, radius=FILLET2_R)

    # Sketch7 → Boss-Extrude5 (add)
    with BuildSketch(Plane.XY.offset(5.5)):
        with Locations((-6.55, 3)):
            Rectangle(SKETCH7_W, SKETCH7_H)
    extrude(amount=BOSS_EXTRUDE5_DEPTH)

    # Sketch8 → Boss-Extrude6 (add)
    with BuildSketch(Plane.XZ.offset(-1)):
        Polygon((-6.4, 6), (4.794322988, 10.322861649), (4.794322988, 10.644453227), (-6.7, 6.20574192), (-6.7, 6), align=None)
    extrude(amount=-BOSS_EXTRUDE6_DEPTH)

    # Fillet3
    fillet3_edges = [part.edges().sort_by_distance(p)[0] for p in [
        (-6.4, 3, 6),
        (-6.7, 3, 6.20574192),
    ]]
    fillet(fillet3_edges, radius=FILLET3_R)

    # Sketch9 → Boss-Extrude7 (add)
    with BuildSketch(Plane.XZ.offset(-1)):
        Polygon((4.794322988, 10.322861649), (10.22344725, 11.202980817), (10.17264879, 11.516337421), (4.794322988, 10.644453227), align=None)
    extrude(amount=-BOSS_EXTRUDE7_DEPTH)

    # Sketch10 → Cut-Extrude3 (cut)
    with BuildSketch(Plane.XZ.offset(-1)):
        Polygon((10.22344725, 11.202980817), (10.17264879, 11.516337421), (4.794322988, 10.644453227), (4.794322988, 10.322861649), (4.845121449, 10.331096623), align=None)
    extrude(amount=-CUT_EXTRUDE3_DEPTH, mode=Mode.SUBTRACT)

    # Fillet4
    # the kernel refuses this fillet: 2 mm, written as the material it adds along each edge
    with BuildSketch(Plane(origin=(4.794322988, 1.2, 10.322861649), x_dir=(-0.9328602490176614, 0, -0.3602384707422385), z_dir=(0, 1, 0))) as fillet4_piece_1:
        with BuildLine():
            CenterArc((FILLET4_R * 0.104281010979, -FILLET4_R), FILLET4_R, 90, 11.906688199)
            Line((-FILLET4_R * 0.102037395433, -FILLET4_R * 0.0215150920042), (0, 0))
            Line((0, 0), (FILLET4_R * 0.104281010979, 0))
        make_face()
    extrude(amount=3.6)
    # the kernel refuses this fillet: 2 mm, written as the material it takes off along each edge
    with BuildSketch(Plane(origin=(4.794322988, 0.678594945, 10.644453227), x_dir=(-0.9328602490176592, 0, -0.36023847074224447), z_dir=(0, 1, 0))) as fillet4_2_piece_1:
        with BuildLine():
            CenterArc((FILLET4_R * 0.104281010979, -FILLET4_R), FILLET4_R, 90, 11.906688199)
            Line((-FILLET4_R * 0.102037395433, -FILLET4_R * 0.0215150920042), (0, 0))
            Line((0, 0), (FILLET4_R * 0.104281010979, 0))
        make_face()
    extrude(amount=4.64281011, mode=Mode.SUBTRACT)

    # Sketch11 → Boss-Extrude8 (add)
    with BuildSketch(Plane(origin=(-1.558625109, 0, 9.614572325), x_dir=(0.9871135021449107, 0, 0.16002166691798186), z_dir=(-0.16002166691798186, 0, 0.9871135021449108))):
        with Locations((10.134422484, 1.35)):
            Rectangle(SKETCH11_W, SKETCH11_H)
        with Locations((10.134422484, 4.65)):
            Rectangle(SKETCH11_W, SKETCH11_H)
    extrude(amount=BOSS_EXTRUDE8_DEPTH)

    # Sketch12 → Cut-Extrude4 (cut)
    with BuildSketch(Plane.XZ.offset(-1.2).offset(CUT_EXTRUDE4_START)):
        with BuildLine():
            ThreePointArc((6.197681115, 14.164380469), (6.505622394, 15.467892315), (7.645091826, 16.171867015))
            Line((7.645091826, 16.171867015), (5.917643198, 15.891829098))
            Line((5.917643198, 15.891829098), (6.197681115, 14.164380469))
        make_face()
        with BuildLine():
            Line((9.372540455, 16.451904932), (7.645091826, 16.171867015))
            ThreePointArc((7.645091826, 16.171867015), (8.948603673, 15.863925736), (9.652578372, 14.724456303))
            Line((9.652578372, 14.724456303), (9.372540455, 16.451904932))
        make_face()
    extrude(amount=CUT_EXTRUDE4_DEPTH, mode=Mode.SUBTRACT)

    # Sketch13 → Boss-Extrude9 (add)
    with BuildSketch(Plane(origin=(0, 1.5, 0), x_dir=(1, 0, 0), z_dir=(0, 1, 0))):
        with Locations(Location((7.925129743, -14.444418386, 0), (0, 0, 29.73428742))):
            Circle(SKETCH13_R)
    extrude(amount=BOSS_EXTRUDE9_DEPTH)

    # Sketch14 → Cut-Extrude5 (cut, up to next)
    with BuildSketch(Plane(origin=(10.175129743, 0, 0), x_dir=(0, 0, -1), z_dir=(1, 0, 0)), mode=Mode.PRIVATE) as cut_extrude5_sk1:
        with Locations((-14.577965265, 1.55)):
            Rectangle(SKETCH14_W, SKETCH14_H)
    cut_extrude5_tool1 = extrude(cut_extrude5_sk1.sketch, amount=-CUT_EXTRUDE5_REACH, mode=Mode.PRIVATE) & part.part
    add(cut_extrude5_tool1.solids().sort_by_distance((10.17513, 1.55, 14.577965))[0], mode=Mode.SUBTRACT)


with BuildPart() as cut_extrude5_piece_1:
    # of the separate pieces the step leaves, piece 1, a body of its own (cut_extrude5_pieces)
    add(part.part.solids().sort_by_distance((4.599763768, 1.2, 10.247729585))[0])

    # Sketch15 → Boss-Extrude10 (add)
    with BuildSketch(Plane.XZ.offset(-1.2)):
        with Locations(Location((7.925129743, 14.444418386, 0), (0, 0, 270))):
            Circle(SKETCH15_R)
    extrude(amount=BOSS_EXTRUDE10_DEPTH)



with BuildPart() as cut_extrude5_piece_2:
    # of the separate pieces the step leaves, piece 2, a body of its own (cut_extrude5_pieces)
    add(part.part.solids().sort_by_distance((9.878883184, 1.6, 13.328467001))[0])

    # Fillet6
    fillet6_edges = [cut_extrude5_piece_2.edges().sort_by_distance(p)[0] for p in [
        (5.971376303, 4.4, 15.560369771),
        (5.971376303, 1.6, 15.560369771),
    ]]
    fillet(fillet6_edges, radius=FILLET6_R)


with BuildPart() as cut_extrude5_piece_1_1:
    add(cut_extrude5_piece_1.part)

    add(cut_extrude5_piece_2.part)  # Boss-Extrude11 merges Cut-Extrude5 piece 2
    # Sketch16 → Boss-Extrude11 (add)
    with BuildSketch(Plane.XZ.offset(-1)):
        with Locations((7.925129743, 14.444418386)):
            Circle(SKETCH16_R)
    extrude(amount=-BOSS_EXTRUDE11_DEPTH)

    # Fillet7
    fillet7_edges = [cut_extrude5_piece_1_1.edges().sort_by_distance(p)[0] for p in [
        (4.794322988, 5, 10.478038204),
        (4.794322988, 1, 10.478038204),
    ]]
    fillet(fillet7_edges, radius=FILLET7_R - 0.0001)  # a hair under: the kernel refuses the full size


solid = cut_extrude5_piece_1_1.part
